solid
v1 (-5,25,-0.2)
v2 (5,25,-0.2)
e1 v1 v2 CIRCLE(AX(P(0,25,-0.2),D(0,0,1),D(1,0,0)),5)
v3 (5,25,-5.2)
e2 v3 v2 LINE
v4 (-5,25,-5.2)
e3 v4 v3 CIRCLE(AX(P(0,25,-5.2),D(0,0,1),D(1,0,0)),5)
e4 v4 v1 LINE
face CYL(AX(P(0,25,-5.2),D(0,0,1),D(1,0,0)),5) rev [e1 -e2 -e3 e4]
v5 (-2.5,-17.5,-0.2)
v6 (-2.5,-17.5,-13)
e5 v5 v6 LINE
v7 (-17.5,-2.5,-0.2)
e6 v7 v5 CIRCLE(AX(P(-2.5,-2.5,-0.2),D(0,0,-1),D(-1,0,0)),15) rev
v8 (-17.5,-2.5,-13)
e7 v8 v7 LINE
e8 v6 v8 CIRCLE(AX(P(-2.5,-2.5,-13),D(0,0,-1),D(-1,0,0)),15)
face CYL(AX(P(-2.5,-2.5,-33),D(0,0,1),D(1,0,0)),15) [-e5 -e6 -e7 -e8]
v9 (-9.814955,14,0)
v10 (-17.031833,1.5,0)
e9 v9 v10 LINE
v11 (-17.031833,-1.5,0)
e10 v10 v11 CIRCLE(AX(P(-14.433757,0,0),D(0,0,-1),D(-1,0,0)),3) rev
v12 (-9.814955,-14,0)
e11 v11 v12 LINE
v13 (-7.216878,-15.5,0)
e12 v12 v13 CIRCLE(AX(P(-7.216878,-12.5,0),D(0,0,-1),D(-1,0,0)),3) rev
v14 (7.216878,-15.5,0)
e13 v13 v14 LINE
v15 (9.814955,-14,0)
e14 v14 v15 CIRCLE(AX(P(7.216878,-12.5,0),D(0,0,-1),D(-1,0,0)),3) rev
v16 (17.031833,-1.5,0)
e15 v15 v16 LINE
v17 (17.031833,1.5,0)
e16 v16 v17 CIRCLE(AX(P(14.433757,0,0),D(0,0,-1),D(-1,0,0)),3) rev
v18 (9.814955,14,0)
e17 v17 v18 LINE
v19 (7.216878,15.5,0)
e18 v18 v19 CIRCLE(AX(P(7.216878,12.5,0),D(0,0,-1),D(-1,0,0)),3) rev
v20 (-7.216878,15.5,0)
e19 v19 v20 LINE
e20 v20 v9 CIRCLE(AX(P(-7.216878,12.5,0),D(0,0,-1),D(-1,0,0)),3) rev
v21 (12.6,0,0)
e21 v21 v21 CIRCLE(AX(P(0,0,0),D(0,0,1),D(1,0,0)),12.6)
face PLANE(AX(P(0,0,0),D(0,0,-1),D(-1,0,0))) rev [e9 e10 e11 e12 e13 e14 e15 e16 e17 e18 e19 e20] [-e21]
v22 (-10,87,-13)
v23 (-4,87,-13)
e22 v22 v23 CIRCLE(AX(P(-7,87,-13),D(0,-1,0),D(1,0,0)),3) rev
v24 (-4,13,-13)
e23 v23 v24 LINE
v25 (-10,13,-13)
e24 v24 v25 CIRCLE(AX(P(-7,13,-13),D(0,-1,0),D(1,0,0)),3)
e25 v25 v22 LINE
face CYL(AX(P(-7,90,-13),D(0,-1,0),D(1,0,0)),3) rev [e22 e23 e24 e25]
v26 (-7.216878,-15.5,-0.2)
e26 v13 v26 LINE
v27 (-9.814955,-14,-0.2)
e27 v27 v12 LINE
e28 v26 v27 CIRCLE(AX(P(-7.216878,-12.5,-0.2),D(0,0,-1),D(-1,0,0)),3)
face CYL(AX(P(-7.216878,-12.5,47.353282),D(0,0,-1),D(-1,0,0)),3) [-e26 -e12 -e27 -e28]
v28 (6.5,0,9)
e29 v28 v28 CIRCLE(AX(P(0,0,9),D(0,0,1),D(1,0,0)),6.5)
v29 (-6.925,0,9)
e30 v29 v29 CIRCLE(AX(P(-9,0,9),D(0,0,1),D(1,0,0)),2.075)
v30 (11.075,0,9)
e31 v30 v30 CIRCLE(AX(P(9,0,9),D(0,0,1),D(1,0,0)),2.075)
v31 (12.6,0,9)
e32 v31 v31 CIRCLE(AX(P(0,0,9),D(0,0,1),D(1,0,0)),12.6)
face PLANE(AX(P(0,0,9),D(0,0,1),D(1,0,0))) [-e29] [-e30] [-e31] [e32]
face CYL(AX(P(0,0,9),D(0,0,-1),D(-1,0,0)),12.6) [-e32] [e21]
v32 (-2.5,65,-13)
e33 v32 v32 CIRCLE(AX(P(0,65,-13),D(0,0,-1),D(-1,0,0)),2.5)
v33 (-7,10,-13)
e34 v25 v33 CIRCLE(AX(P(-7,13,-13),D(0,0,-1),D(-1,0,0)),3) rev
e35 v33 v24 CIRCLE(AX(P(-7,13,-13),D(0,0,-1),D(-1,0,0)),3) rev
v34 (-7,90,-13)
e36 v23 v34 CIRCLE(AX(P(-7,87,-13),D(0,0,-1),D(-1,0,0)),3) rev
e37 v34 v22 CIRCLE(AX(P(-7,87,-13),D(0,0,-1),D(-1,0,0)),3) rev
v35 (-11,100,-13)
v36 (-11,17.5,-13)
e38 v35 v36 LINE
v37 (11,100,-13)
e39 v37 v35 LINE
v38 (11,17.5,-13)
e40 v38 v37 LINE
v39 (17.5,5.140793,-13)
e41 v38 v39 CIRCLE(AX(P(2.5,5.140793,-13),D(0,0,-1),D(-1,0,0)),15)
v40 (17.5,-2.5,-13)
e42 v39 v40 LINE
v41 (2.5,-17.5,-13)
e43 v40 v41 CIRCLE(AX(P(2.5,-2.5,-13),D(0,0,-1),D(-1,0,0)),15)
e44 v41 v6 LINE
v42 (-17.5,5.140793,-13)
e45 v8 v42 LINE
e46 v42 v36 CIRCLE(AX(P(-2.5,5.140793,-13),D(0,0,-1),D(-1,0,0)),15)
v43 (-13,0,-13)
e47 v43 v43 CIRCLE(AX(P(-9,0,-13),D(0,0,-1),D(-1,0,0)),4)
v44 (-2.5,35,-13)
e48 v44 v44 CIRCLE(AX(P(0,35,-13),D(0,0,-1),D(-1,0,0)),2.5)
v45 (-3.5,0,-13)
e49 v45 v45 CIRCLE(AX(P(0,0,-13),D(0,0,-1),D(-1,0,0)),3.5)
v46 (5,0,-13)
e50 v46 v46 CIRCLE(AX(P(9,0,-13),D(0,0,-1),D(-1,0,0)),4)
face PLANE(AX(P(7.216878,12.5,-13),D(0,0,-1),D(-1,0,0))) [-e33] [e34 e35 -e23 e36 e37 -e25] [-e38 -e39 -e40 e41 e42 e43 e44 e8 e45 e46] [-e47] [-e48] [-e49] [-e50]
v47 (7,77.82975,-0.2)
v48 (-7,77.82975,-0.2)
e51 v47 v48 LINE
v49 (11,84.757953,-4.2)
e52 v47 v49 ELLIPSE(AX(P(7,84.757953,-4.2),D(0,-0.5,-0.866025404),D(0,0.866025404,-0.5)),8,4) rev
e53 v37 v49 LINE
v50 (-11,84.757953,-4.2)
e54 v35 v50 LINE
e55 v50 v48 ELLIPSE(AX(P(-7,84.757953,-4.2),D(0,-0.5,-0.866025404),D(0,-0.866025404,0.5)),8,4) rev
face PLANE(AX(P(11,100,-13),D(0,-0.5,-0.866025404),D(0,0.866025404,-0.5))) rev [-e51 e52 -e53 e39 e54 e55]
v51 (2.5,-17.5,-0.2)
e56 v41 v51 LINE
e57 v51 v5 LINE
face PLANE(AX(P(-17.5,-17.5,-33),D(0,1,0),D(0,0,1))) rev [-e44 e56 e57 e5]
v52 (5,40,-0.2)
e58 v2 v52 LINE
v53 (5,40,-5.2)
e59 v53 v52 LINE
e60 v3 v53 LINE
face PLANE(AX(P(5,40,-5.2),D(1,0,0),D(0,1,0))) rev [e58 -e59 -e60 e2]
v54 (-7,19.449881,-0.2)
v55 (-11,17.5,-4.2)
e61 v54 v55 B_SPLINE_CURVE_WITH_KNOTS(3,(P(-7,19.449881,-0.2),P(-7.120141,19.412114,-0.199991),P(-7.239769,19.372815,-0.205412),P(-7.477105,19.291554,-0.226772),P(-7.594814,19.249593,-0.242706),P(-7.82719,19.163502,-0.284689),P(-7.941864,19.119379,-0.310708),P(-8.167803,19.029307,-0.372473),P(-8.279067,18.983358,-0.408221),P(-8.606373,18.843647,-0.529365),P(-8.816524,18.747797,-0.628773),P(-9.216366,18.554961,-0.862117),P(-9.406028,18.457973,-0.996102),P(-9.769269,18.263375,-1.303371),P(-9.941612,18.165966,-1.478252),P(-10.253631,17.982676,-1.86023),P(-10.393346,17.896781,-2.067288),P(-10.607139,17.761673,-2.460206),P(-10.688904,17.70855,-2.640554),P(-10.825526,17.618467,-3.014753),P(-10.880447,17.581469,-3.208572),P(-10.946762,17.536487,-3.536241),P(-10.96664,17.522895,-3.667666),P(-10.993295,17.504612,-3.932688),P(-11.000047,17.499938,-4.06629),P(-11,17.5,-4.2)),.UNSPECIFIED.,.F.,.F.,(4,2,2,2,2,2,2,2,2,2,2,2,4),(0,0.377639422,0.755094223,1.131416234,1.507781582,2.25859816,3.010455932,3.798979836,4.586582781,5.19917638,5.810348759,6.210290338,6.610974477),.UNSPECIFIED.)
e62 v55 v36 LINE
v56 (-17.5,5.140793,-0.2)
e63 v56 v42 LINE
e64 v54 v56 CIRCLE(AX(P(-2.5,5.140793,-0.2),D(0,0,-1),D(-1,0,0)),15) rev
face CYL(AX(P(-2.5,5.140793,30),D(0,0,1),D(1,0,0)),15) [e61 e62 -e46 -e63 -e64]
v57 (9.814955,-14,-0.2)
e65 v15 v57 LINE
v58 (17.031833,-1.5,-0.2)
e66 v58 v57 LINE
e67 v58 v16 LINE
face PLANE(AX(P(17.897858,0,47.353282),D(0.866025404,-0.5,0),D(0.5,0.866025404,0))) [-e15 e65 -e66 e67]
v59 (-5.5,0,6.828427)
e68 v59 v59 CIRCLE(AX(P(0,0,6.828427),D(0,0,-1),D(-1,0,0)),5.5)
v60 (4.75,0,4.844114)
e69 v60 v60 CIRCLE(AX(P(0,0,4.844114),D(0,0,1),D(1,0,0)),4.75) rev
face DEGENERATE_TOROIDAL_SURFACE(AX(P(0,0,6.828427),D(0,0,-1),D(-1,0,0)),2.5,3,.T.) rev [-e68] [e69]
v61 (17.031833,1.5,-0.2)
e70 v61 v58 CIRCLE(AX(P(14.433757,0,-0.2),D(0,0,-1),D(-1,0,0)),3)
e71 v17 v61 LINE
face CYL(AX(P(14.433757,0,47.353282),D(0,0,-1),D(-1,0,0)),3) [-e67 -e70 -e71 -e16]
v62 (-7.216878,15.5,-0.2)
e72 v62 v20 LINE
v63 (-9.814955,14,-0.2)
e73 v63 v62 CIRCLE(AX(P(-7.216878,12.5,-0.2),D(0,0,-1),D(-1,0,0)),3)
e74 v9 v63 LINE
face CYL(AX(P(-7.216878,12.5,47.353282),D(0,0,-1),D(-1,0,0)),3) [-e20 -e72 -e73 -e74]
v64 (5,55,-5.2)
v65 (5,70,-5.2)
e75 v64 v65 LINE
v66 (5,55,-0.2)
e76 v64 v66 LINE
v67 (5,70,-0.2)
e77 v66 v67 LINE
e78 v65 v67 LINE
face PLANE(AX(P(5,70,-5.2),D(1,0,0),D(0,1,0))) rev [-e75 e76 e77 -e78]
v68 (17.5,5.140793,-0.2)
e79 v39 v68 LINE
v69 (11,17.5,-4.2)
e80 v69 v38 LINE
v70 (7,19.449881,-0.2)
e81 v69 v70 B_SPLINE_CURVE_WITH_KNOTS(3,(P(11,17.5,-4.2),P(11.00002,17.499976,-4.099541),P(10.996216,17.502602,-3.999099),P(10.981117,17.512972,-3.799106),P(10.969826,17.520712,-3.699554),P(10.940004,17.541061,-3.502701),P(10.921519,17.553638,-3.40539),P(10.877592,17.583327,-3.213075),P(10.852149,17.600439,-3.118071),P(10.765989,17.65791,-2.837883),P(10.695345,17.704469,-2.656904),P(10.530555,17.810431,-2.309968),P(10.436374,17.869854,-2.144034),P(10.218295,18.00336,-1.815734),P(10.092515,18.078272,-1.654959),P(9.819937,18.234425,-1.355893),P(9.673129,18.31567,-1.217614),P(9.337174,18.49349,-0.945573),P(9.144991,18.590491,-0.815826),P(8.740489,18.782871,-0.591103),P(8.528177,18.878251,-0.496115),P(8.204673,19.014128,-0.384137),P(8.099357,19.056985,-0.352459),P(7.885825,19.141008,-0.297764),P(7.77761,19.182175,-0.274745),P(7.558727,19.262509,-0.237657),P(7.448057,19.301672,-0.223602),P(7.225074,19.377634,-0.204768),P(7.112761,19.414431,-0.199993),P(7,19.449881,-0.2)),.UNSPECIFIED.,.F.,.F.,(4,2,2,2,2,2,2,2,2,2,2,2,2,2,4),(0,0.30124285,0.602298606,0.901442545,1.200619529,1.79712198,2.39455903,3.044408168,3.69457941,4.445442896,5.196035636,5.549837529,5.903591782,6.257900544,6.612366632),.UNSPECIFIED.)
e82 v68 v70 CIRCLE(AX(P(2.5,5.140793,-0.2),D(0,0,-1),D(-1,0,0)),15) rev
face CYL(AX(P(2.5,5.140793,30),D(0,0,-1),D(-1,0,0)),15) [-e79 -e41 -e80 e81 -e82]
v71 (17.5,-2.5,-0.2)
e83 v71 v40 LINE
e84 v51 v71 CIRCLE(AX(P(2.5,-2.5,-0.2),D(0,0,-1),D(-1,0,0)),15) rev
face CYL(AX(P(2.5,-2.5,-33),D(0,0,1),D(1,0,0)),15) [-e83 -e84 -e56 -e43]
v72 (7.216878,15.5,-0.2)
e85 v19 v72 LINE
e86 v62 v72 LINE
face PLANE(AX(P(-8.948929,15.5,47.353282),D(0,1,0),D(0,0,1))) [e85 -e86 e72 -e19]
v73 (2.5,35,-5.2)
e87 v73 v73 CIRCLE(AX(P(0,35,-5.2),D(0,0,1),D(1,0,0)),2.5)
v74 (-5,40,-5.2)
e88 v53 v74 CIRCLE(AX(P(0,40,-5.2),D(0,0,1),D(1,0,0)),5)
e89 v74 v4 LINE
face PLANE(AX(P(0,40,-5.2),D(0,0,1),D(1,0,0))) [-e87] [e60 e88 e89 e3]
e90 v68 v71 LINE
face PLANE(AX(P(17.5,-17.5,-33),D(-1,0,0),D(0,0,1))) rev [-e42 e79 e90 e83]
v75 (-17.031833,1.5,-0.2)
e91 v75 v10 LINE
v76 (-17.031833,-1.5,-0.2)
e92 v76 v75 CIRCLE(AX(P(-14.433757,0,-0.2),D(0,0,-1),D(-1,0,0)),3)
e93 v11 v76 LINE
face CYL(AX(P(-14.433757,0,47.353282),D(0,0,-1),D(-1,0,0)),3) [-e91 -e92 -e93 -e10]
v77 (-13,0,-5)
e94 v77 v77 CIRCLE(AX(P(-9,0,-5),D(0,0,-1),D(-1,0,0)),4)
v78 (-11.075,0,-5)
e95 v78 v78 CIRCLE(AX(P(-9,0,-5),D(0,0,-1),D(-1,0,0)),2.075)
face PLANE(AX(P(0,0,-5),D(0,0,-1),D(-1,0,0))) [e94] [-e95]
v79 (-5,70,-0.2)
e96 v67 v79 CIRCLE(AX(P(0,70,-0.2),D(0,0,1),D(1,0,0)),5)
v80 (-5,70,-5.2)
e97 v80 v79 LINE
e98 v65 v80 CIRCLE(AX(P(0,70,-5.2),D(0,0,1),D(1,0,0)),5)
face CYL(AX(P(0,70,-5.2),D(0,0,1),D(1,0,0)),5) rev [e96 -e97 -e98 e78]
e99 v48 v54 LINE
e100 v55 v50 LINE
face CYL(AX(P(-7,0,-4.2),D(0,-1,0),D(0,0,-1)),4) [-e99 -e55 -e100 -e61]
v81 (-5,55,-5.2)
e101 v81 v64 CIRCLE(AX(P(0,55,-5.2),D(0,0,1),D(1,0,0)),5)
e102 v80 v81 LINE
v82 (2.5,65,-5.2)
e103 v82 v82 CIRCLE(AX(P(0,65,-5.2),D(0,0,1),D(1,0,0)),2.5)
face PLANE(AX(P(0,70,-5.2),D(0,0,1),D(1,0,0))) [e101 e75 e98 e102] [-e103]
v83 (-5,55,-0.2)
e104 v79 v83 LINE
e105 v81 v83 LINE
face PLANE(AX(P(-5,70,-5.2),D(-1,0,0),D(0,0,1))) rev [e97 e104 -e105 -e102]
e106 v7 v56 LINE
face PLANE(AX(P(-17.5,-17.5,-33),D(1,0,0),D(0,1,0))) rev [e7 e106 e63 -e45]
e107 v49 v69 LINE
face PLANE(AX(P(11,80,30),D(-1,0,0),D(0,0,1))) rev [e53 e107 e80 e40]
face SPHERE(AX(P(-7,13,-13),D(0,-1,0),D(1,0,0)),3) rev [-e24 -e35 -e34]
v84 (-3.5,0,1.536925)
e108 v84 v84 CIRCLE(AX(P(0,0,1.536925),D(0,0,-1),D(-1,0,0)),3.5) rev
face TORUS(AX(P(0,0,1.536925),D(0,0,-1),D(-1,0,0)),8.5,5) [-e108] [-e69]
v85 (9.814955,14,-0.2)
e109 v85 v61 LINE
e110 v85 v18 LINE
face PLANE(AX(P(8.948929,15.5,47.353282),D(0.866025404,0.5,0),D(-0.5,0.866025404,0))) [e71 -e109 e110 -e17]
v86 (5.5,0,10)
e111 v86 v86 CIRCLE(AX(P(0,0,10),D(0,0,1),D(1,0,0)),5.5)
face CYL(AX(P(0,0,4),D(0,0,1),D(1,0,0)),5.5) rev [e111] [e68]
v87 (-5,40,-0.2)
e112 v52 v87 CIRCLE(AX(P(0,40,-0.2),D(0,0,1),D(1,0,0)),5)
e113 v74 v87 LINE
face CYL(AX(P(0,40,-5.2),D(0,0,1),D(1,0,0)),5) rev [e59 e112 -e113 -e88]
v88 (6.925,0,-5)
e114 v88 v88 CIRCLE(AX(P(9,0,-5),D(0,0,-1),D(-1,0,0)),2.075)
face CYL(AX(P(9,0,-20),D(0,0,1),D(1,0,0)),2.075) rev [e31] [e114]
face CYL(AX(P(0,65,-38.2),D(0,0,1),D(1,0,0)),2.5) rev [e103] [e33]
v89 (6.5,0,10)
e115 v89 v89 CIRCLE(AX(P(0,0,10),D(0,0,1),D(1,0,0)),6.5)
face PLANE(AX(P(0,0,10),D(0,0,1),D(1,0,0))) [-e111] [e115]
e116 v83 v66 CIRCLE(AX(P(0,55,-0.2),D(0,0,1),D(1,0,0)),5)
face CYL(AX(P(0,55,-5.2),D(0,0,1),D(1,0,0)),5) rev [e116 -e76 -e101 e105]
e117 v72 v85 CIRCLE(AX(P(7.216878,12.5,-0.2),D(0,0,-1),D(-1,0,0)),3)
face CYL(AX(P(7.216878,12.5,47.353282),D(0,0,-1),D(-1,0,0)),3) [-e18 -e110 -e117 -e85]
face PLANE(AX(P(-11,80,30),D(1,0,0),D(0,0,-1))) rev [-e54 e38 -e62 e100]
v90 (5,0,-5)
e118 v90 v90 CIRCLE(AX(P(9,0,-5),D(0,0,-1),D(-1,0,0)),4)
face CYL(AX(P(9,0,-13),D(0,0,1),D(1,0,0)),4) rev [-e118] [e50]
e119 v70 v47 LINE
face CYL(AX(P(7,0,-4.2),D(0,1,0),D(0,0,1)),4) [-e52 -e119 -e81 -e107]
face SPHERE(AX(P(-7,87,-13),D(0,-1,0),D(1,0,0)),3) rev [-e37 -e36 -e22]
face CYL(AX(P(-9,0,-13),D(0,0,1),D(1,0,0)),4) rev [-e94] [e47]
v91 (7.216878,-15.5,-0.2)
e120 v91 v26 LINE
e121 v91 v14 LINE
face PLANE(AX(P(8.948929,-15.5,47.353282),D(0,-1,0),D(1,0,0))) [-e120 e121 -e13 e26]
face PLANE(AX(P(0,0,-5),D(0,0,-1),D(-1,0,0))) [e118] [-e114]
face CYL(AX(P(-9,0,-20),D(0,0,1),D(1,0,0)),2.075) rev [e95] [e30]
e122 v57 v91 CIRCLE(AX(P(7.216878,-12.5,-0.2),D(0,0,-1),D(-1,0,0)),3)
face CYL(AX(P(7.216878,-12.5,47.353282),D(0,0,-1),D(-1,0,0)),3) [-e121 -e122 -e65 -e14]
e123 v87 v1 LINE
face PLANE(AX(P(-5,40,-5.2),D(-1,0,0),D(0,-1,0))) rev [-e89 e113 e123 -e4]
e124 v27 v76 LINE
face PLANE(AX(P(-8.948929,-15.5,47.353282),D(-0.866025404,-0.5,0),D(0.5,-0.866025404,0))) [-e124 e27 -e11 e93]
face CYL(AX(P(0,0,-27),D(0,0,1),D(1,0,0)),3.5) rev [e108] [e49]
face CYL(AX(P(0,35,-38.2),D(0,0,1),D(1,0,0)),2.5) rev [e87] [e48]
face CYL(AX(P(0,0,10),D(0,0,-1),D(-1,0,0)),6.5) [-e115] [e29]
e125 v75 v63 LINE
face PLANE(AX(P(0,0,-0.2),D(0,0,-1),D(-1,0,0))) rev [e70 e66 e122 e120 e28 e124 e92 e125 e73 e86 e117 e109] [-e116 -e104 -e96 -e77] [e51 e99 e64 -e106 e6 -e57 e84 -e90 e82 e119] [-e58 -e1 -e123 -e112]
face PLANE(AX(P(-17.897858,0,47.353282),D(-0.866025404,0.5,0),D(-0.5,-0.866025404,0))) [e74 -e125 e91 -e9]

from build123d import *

# Parameters (mm, degrees)
SKETCH_1_R               = 12.6
EXTRUDE_1_DEPTH          = 9
SKETCH_2_R               = 15
EXTRUDE_2_DEPTH          = 5
SKETCH_3_R               = 5.5
CUT_EXTRUDE_1_DEPTH      = 5
SKETCH_4_R               = 2.075
CUT_EXTRUDE_2_DEPTH      = 29
SKETCH_5_R               = 3.5
CUT_EXTRUDE_3_DEPTH      = 31
FILLET_1_R               = 3
FILLET_2_R               = 5
EXTRUDE_START            = 1
SKETCH_6_R               = 6.5
SKETCH_6_R_2             = 5.5
EXTRUDE_1_2_DEPTH        = 1
EXTRUDE_START_2          = -5
SKETCH_7_R               = 15
EXTRUDE_3_DEPTH          = 5
FILLET_3_R               = 3
EXTRUDE_START_3          = 8
SKETCH_8_R               = 3.5
SKETCH_8_R_2             = 4
EXTRUDE_4_DEPTH          = 8
SKETCH_9_W               = 35
SKETCH_9_H               = 35
SKETCH_9_W_2             = 20
SKETCH_9_H_2             = 20
EXTRUDE_5_DEPTH          = 20
SKETCH_10_W              = 35
SKETCH_10_H              = 35
EXTRUDE_6_DEPTH          = 8.5
SKETCH_11_R              = 2.5
CUT_EXTRUDE_4_DEPTH      = 15
PATTERN_CIRCULAR_1_COUNT = 4
CUT_EXTRUDE_START        = 83
SKETCH_12_R              = 4
CUT_EXTRUDE_5_DEPTH      = 83
SKETCH_14_W              = 23.212780374
SKETCH_14_H              = 20
CUT_EXTRUDE_6_DEPTH      = 41
SKETCH_15_W              = 35
SKETCH_15_H              = 35
EXTRUDE_7_DEPTH          = 1.3
SKETCH_20_W              = 50.753673386
SKETCH_20_H              = 47.344844578
CUT_EXTRUDE_9_DEPTH      = 46
SKETCH_21_W              = 35
SKETCH_21_H              = 62.5
EXTRUDE_9_DEPTH          = 9.8
SKETCH_22_W              = 35
SKETCH_22_H              = 97.5
EXTRUDE_10_DEPTH         = 3
SKETCH_23_W              = 6.5
SKETCH_23_H              = 62.5
CUT_EXTRUDE_10_DEPTH     = 43
FILLET_10_R              = 15
FILLET_11_R              = 15
CUT_EXTRUDE_11_DEPTH     = 5
SKETCH_25_R              = 2.5
CUT_EXTRUDE_12_DEPTH     = 33
SKETCH_26_W              = 22
SKETCH_26_H              = 12.8
EXTRUDE_11_DEPTH         = 20
CUT_EXTRUDE_START_2      = -22
CUT_EXTRUDE_13_DEPTH     = 22
SWEEP_1_PROFILE_R        = 3
FILLET_13_R              = 3
FILLET_14_R              = 3
FILLET_15_R              = 4


# Some blends are built 0.0001 mm under size
with BuildPart() as part:
    # 草图1 → Extrude 1 (new body)
    with BuildSketch(Plane.XY):
        Circle(SKETCH_1_R)
    extrude(amount=EXTRUDE_1_DEPTH)

    # 草图2 → 凸台-拉伸2 (add)
    with BuildSketch(Plane(origin=(0, 0, 0), x_dir=(-1, 0, 0), z_dir=(0, 0, -1))):
        Circle(SKETCH_2_R)
    extrude(amount=EXTRUDE_2_DEPTH)

    # 草图3 → Cut-Extrude 1 (cut)
    with BuildSketch(Plane.XY.offset(9)):
        Circle(SKETCH_3_R)
    extrude(amount=-CUT_EXTRUDE_1_DEPTH, mode=Mode.SUBTRACT)

    # 草图4 → 切除-拉伸2 (cut)
    with BuildSketch(Plane.XY.offset(9)):
        with Locations((-9, 0)):
            Circle(SKETCH_4_R)
        with Locations((9, 0)):
            Circle(SKETCH_4_R)
    extrude(amount=-CUT_EXTRUDE_2_DEPTH, mode=Mode.SUBTRACT)

    # 草图5 → 切除-拉伸3 (cut)
    with BuildSketch(Plane.XY.offset(4)):
        Circle(SKETCH_5_R)
    extrude(amount=-CUT_EXTRUDE_3_DEPTH, mode=Mode.SUBTRACT)

    # 圆角1
    # the kernel refuses this fillet: 3 mm, written as the material it adds along each edge
    with BuildSketch(Plane(origin=(0, 0, 4), x_dir=(1, 0, 0), z_dir=(0, -1, 0))) as fillet_1_piece_1:
        with BuildLine():
            CenterArc((2.5, 2.828427125), FILLET_1_R, 289.471220634, 70.528779366)
            Line((5.5, 2.828427125), (5.56, 2.828427125))
            Line((5.56, 2.828427125), (5.56, 0))
            Line((5.56, 0), (5.5, -0.06))
            ThreePointArc((5.5, -0.06), (4.5, -0.06), (3.52, -0.056568542))
            Line((3.52, -0.056568542), (3.5, 0))
        make_face()
    revolve(axis=Axis((0, 0, 4), (0, 0, 1)))

    # 圆角2
    fillet_2_edges = [part.edges().sort_by_distance(p)[0] for p in [
        (-3.5, 0, 4),
    ]]
    fillet(fillet_2_edges, radius=FILLET_2_R)

    # 草图6 → Extrude 1 2 (add)
    with BuildSketch(Plane.XY.offset(9).offset(EXTRUDE_START)):
        Circle(SKETCH_6_R)
        Circle(SKETCH_6_R_2, mode=Mode.SUBTRACT)
    extrude(amount=-EXTRUDE_1_2_DEPTH)

    # 草图7 → 凸台-拉伸3 (add)
    with BuildSketch(Plane(origin=(0, 0, -5), x_dir=(-1, 0, 0), z_dir=(0, 0, -1)).offset(EXTRUDE_START_2)):
        Polygon((-8.948929172, 15.5), (-17.897858345, 0), (-8.948929172, -15.5), (8.948929172, -15.5), (17.897858345, 0), (8.948929172, 15.5), align=None)
        Circle(SKETCH_7_R, mode=Mode.SUBTRACT)
    extrude(amount=EXTRUDE_3_DEPTH)

    # 圆角3
    fillet_3_edges = [part.edges().sort_by_distance(p)[0] for p in [
        (17.897858345, 0, -2.5),
        (8.948929172, -15.5, -2.5),
        (-8.948929172, -15.5, -2.5),
        (-17.897858345, 0, -2.5),
        (-8.948929172, 15.5, -2.5),
        (8.948929172, 15.5, -2.5),
    ]]
    fillet(fillet_3_edges, radius=FILLET_3_R)

    # 草图8 → 凸台-拉伸4 (add)
    with BuildSketch(Plane(origin=(0, 0, -5), x_dir=(-1, 0, 0), z_dir=(0, 0, -1)).offset(EXTRUDE_START_3)):
        with BuildLine():
            Line((-9.814954576, 14), (-17.031832941, 1.5))
            ThreePointArc((-17.031832941, 1.5), (-17.43375673, 0), (-17.031832941, -1.5))
            Line((-17.031832941, -1.5), (-9.814954576, -14))
            ThreePointArc((-9.814954576, -14), (-8.716878365, -15.098076211), (-7.216878365, -15.5))
            Line((-7.216878365, -15.5), (7.216878365, -15.5))
            ThreePointArc((7.216878365, -15.5), (8.716878365, -15.098076211), (9.814954576, -14))
            Line((9.814954576, -14), (17.031832941, -1.5))
            ThreePointArc((17.031832941, -1.5), (17.43375673, 0), (17.031832941, 1.5))
            Line((17.031832941, 1.5), (9.814954576, 14))
            ThreePointArc((9.814954576, 14), (8.716878365, 15.098076211), (7.216878365, 15.5))
            Line((7.216878365, 15.5), (-7.216878365, 15.5))
            ThreePointArc((-7.216878365, 15.5), (-8.716878365, 15.098076211), (-9.814954576, 14))
        make_face()
        Circle(SKETCH_8_R, mode=Mode.SUBTRACT)
        with Locations((-9, 0)):
            Circle(SKETCH_8_R_2, mode=Mode.SUBTRACT)
        with Locations((9, 0)):
            Circle(SKETCH_8_R_2, mode=Mode.SUBTRACT)
    extrude(amount=-EXTRUDE_4_DEPTH)

    # 草图9 → 凸台-拉伸5 (add)
    with BuildSketch(Plane(origin=(0, 0, -13), x_dir=(-1, 0, 0), z_dir=(0, 0, -1))):
        Rectangle(SKETCH_9_W, SKETCH_9_H)
        Rectangle(SKETCH_9_W_2, SKETCH_9_H_2, mode=Mode.SUBTRACT)
    extrude(amount=EXTRUDE_5_DEPTH)

    # 草图10 → 凸台-拉伸6 (add)
    with BuildSketch(Plane.XY.offset(-13)):
        Rectangle(SKETCH_10_W, SKETCH_10_H)
        with BuildLine():
            Line((7.216878365, 15.5), (-7.216878365, 15.5))
            ThreePointArc((-7.216878365, 15.5), (-8.716878365, 15.098076211), (-9.814954576, 14))
            Line((-9.814954576, 14), (-17.031832941, 1.5))
            ThreePointArc((-17.031832941, 1.5), (-17.43375673, 0), (-17.031832941, -1.5))
            Line((-17.031832941, -1.5), (-9.814954576, -14))
            ThreePointArc((-9.814954576, -14), (-8.716878365, -15.098076211), (-7.216878365, -15.5))
            Line((-7.216878365, -15.5), (7.216878365, -15.5))
            ThreePointArc((7.216878365, -15.5), (8.716878365, -15.098076211), (9.814954576, -14))
            Line((9.814954576, -14), (17.031832941, -1.5))
            ThreePointArc((17.031832941, -1.5), (17.43375673, 0), (17.031832941, 1.5))
            Line((17.031832941, 1.5), (9.814954576, 14))
            ThreePointArc((9.814954576, 14), (8.716878365, 15.098076211), (7.216878365, 15.5))
        make_face(mode=Mode.SUBTRACT)
    extrude(amount=EXTRUDE_6_DEPTH)

    # 草图11 → 切除-拉伸4 (cut)
    with BuildSketch(Plane.ZY.offset(17.5)):
        with Locations(Location((-23, 0, 0), (0, 0, 270))):
            Circle(SKETCH_11_R)
    cut_extrude_4 = extrude(amount=-CUT_EXTRUDE_4_DEPTH, mode=Mode.SUBTRACT)

    # 阵列(圆周)1: 切除-拉伸4 ×4 about axis
    pattern_circular_1_axis = Axis((0, 0, -27), (0, 0, 1))
    for i in range(1, PATTERN_CIRCULAR_1_COUNT):
        add(cut_extrude_4.rotate(pattern_circular_1_axis, i * 360 / PATTERN_CIRCULAR_1_COUNT), mode=Mode.SUBTRACT)

    # 草图12 → 切除-拉伸5 (cut)
    with BuildSketch(Plane(origin=(0, 0, -5), x_dir=(-1, 0, 0), z_dir=(0, 0, -1)).offset(CUT_EXTRUDE_START)):
        with Locations(Location((9, 0, 0), (0, 0, 75.522487814))):
            Circle(SKETCH_12_R)
        with Locations(Location((-9, 0, 0), (0, 0, 255.522487814))):
            Circle(SKETCH_12_R)
    extrude(amount=-CUT_EXTRUDE_5_DEPTH, mode=Mode.SUBTRACT)

    # 草图14 → 切除-拉伸6 (cut)
    with BuildSketch(Plane(origin=(0, 0, -13), x_dir=(-1, 0, 0), z_dir=(0, 0, -1))):
        with Locations((21.606390187, 0)):
            Rectangle(SKETCH_14_W, SKETCH_14_H)
    extrude(amount=CUT_EXTRUDE_6_DEPTH, mode=Mode.SUBTRACT)

    # 草图15 → 凸台-拉伸7 (add)
    with BuildSketch(Plane.XY.offset(-4.5)):
        Rectangle(SKETCH_15_W, SKETCH_15_H)
        with BuildLine():
            Line((9.814954576, -14), (17.031832941, -1.5))
            ThreePointArc((17.031832941, -1.5), (17.43375673, 0), (17.031832941, 1.5))
            Line((17.031832941, 1.5), (9.814954576, 14))
            ThreePointArc((9.814954576, 14), (8.716878365, 15.098076211), (7.216878365, 15.5))
            Line((7.216878365, 15.5), (-7.216878365, 15.5))
            ThreePointArc((-7.216878365, 15.5), (-8.716878365, 15.098076211), (-9.814954576, 14))
            Line((-9.814954576, 14), (-17.031832941, 1.5))
            ThreePointArc((-17.031832941, 1.5), (-17.43375673, 0), (-17.031832941, -1.5))
            Line((-17.031832941, -1.5), (-9.814954576, -14))
            ThreePointArc((-9.814954576, -14), (-8.716878365, -15.098076211), (-7.216878365, -15.5))
            Line((-7.216878365, -15.5), (7.216878365, -15.5))
            ThreePointArc((7.216878365, -15.5), (8.716878365, -15.098076211), (9.814954576, -14))
        make_face(mode=Mode.SUBTRACT)
    extrude(amount=EXTRUDE_7_DEPTH)

    # 草图20 → 切除-拉伸9 (cut)
    with BuildSketch(Plane(origin=(0, 0, -13), x_dir=(-1, 0, 0), z_dir=(0, 0, -1))):
        Rectangle(SKETCH_20_W, SKETCH_20_H)
    extrude(amount=CUT_EXTRUDE_9_DEPTH, mode=Mode.SUBTRACT)

    # 草图21 → 凸台-拉伸9 (add)
    with BuildSketch(Plane(origin=(0, 0, -13), x_dir=(-1, 0, 0), z_dir=(0, 0, -1))):
        with Locations((0, 48.75)):
            Rectangle(SKETCH_21_W, SKETCH_21_H)
    extrude(amount=-EXTRUDE_9_DEPTH)

    # 草图22 → 凸台-拉伸10 (add)
    with BuildSketch(Plane.XY.offset(-3.2)):
        with Locations((0, 31.25)):
            Rectangle(SKETCH_22_W, SKETCH_22_H)
        with BuildLine():
            Line((9.814954576, -14), (17.031832941, -1.5))
            ThreePointArc((17.031832941, -1.5), (17.43375673, 0), (17.031832941, 1.5))
            Line((17.031832941, 1.5), (9.814954576, 14))
            ThreePointArc((9.814954576, 14), (8.716878365, 15.098076211), (7.216878365, 15.5))
            Line((7.216878365, 15.5), (-7.216878365, 15.5))
            ThreePointArc((-7.216878365, 15.5), (-8.716878365, 15.098076211), (-9.814954576, 14))
            Line((-9.814954576, 14), (-17.031832941, 1.5))
            ThreePointArc((-17.031832941, 1.5), (-17.43375673, 0), (-17.031832941, -1.5))
            Line((-17.031832941, -1.5), (-9.814954576, -14))
            ThreePointArc((-9.814954576, -14), (-8.716878365, -15.098076211), (-7.216878365, -15.5))
            Line((-7.216878365, -15.5), (7.216878365, -15.5))
            ThreePointArc((7.216878365, -15.5), (8.716878365, -15.098076211), (9.814954576, -14))
        make_face(mode=Mode.SUBTRACT)
    extrude(amount=EXTRUDE_10_DEPTH)

    # 草图23 → 切除-拉伸10 (cut)
    with BuildSketch(Plane(origin=(0, 0, -13), x_dir=(-1, 0, 0), z_dir=(0, 0, -1))):
        with Locations((-14.25, 48.75)):
            Rectangle(SKETCH_23_W, SKETCH_23_H)
        with Locations((14.25, 48.75)):
            Rectangle(SKETCH_23_W, SKETCH_23_H)
    extrude(amount=-CUT_EXTRUDE_10_DEPTH, mode=Mode.SUBTRACT)

    # 圆角10
    fillet_10_edges = [part.edges().sort_by_distance(p)[0] for p in [
        (17.5, -17.5, -6.6),
        (-17.5, -17.5, -6.6),
    ]]
    fillet(fillet_10_edges, radius=FILLET_10_R)

    # 圆角11
    # the kernel refuses this fillet: 15 mm, written as the material it takes off along each edge
    with BuildSketch(Plane(origin=(17.5, 17.5, -43.898017736), x_dir=(0, -1, 0), z_dir=(0, 0, 1))) as fillet_11_piece_1:
        with BuildLine():
            CenterArc((12.359207094, -15), FILLET_11_R, 90, 55.481892159)
            Line((0, -6.5), (-0.247184142, -6.33))
            ThreePointArc((-0.247184142, -6.33), (-0.3, -3.25), (-0.3, 0))
            Line((-0.3, 0), (0, 0.3))
            Line((0, 0.3), (12.359207094, 0.3))
            Line((12.359207094, 0.3), (12.359207094, 0))
        make_face()
    extrude(amount=74.596035472, mode=Mode.SUBTRACT)
    with BuildSketch(Plane(origin=(-17.5, 17.5, -43.898017736), x_dir=(0, -1, 0), z_dir=(0, 0, 1))) as fillet_11_piece_2:
        with BuildLine():
            CenterArc((12.359207094, 15), FILLET_11_R, 214.518107841, 55.481892159)
            Line((0, 6.5), (-0.247184142, 6.33))
            ThreePointArc((-0.247184142, 6.33), (-0.3, 3.25), (-0.3, 0))
            Line((-0.3, 0), (0, -0.3))
            Line((0, -0.3), (12.359207094, -0.3))
            Line((12.359207094, -0.3), (12.359207094, 0))
        make_face()
    extrude(amount=74.596035472, mode=Mode.SUBTRACT)

    # 草图24 → 切除-拉伸11 (cut)
    with BuildSketch(Plane.XY.offset(-0.2)):
        with BuildLine():
            Line((5, 70), (5, 55))
            ThreePointArc((5, 55), (0, 50), (-5, 55))
            Line((-5, 55), (-5, 70))
            ThreePointArc((-5, 70), (0, 75), (5, 70))
        make_face()
        with BuildLine():
            Line((5, 40), (5, 25))
            ThreePointArc((5, 25), (0, 20), (-5, 25))
            Line((-5, 25), (-5, 40))
            ThreePointArc((-5, 40), (0, 45), (5, 40))
        make_face()
    extrude(amount=-CUT_EXTRUDE_11_DEPTH, mode=Mode.SUBTRACT)

    # 草图25 → 切除-拉伸12 (cut)
    with BuildSketch(Plane.XY.offset(-5.2)):
        with Locations((0, 65)):
            Circle(SKETCH_25_R)
        with Locations((0, 35)):
            Circle(SKETCH_25_R)
    extrude(amount=-CUT_EXTRUDE_12_DEPTH, mode=Mode.SUBTRACT)

    # 草图26 → 凸台-拉伸11 (add)
    with BuildSketch(Plane(origin=(0, 80, 0), x_dir=(1, 0, 0), z_dir=(0, 1, 0))):
        with Locations((0, 6.6)):
            Rectangle(SKETCH_26_W, SKETCH_26_H)
    extrude(amount=EXTRUDE_11_DEPTH)

    # 草图27 → 切除-拉伸13 (cut)
    with BuildSketch(Plane.ZY.offset(11).offset(CUT_EXTRUDE_START_2)):
        Polygon((-13, 100), (-0.2, 77.829749663), (-0.2, 100), align=None)
    extrude(amount=CUT_EXTRUDE_13_DEPTH, mode=Mode.SUBTRACT)

    # 切除-扫描1: sweep along a path in 草图28
    with BuildLine(Plane(origin=(0, 0, -13), x_dir=(-1, 0, 0), z_dir=(0, 0, -1))) as sweep_1_path:
        Line((7, 90), (7, 10))
    # 切除-扫描1 profile (on start of the path) → 切除-扫描1 (sweep, cut)
    with BuildSketch(Plane(origin=(-7, 90, -13), x_dir=(-1, 0, 0), z_dir=(0, -1, 0))):
        Circle(SWEEP_1_PROFILE_R)
    sweep(path=sweep_1_path.line, mode=Mode.SUBTRACT)

    # 圆角13
    fillet_13_edges = [part.edges().sort_by_distance(p)[0] for p in [
        (-7, 10, -10),
    ]]
    fillet(fillet_13_edges, radius=FILLET_13_R - 0.0001)  # a hair under: the kernel refuses the full size

    # 圆角14
    fillet_14_edges = [part.edges().sort_by_distance(p)[0] for p in [
        (-7, 90, -10),
    ]]
    fillet(fillet_14_edges, radius=FILLET_14_R - 0.0001)  # a hair under: the kernel refuses the full size

    # 圆角15
    fillet_15_edges = [part.edges().sort_by_distance(p)[0] for p in [
        (11, 47.664874832, -0.2),
        (-11, 47.664874832, -0.2),
    ]]
    fillet(fillet_15_edges, radius=FILLET_15_R)


solid = part.part
